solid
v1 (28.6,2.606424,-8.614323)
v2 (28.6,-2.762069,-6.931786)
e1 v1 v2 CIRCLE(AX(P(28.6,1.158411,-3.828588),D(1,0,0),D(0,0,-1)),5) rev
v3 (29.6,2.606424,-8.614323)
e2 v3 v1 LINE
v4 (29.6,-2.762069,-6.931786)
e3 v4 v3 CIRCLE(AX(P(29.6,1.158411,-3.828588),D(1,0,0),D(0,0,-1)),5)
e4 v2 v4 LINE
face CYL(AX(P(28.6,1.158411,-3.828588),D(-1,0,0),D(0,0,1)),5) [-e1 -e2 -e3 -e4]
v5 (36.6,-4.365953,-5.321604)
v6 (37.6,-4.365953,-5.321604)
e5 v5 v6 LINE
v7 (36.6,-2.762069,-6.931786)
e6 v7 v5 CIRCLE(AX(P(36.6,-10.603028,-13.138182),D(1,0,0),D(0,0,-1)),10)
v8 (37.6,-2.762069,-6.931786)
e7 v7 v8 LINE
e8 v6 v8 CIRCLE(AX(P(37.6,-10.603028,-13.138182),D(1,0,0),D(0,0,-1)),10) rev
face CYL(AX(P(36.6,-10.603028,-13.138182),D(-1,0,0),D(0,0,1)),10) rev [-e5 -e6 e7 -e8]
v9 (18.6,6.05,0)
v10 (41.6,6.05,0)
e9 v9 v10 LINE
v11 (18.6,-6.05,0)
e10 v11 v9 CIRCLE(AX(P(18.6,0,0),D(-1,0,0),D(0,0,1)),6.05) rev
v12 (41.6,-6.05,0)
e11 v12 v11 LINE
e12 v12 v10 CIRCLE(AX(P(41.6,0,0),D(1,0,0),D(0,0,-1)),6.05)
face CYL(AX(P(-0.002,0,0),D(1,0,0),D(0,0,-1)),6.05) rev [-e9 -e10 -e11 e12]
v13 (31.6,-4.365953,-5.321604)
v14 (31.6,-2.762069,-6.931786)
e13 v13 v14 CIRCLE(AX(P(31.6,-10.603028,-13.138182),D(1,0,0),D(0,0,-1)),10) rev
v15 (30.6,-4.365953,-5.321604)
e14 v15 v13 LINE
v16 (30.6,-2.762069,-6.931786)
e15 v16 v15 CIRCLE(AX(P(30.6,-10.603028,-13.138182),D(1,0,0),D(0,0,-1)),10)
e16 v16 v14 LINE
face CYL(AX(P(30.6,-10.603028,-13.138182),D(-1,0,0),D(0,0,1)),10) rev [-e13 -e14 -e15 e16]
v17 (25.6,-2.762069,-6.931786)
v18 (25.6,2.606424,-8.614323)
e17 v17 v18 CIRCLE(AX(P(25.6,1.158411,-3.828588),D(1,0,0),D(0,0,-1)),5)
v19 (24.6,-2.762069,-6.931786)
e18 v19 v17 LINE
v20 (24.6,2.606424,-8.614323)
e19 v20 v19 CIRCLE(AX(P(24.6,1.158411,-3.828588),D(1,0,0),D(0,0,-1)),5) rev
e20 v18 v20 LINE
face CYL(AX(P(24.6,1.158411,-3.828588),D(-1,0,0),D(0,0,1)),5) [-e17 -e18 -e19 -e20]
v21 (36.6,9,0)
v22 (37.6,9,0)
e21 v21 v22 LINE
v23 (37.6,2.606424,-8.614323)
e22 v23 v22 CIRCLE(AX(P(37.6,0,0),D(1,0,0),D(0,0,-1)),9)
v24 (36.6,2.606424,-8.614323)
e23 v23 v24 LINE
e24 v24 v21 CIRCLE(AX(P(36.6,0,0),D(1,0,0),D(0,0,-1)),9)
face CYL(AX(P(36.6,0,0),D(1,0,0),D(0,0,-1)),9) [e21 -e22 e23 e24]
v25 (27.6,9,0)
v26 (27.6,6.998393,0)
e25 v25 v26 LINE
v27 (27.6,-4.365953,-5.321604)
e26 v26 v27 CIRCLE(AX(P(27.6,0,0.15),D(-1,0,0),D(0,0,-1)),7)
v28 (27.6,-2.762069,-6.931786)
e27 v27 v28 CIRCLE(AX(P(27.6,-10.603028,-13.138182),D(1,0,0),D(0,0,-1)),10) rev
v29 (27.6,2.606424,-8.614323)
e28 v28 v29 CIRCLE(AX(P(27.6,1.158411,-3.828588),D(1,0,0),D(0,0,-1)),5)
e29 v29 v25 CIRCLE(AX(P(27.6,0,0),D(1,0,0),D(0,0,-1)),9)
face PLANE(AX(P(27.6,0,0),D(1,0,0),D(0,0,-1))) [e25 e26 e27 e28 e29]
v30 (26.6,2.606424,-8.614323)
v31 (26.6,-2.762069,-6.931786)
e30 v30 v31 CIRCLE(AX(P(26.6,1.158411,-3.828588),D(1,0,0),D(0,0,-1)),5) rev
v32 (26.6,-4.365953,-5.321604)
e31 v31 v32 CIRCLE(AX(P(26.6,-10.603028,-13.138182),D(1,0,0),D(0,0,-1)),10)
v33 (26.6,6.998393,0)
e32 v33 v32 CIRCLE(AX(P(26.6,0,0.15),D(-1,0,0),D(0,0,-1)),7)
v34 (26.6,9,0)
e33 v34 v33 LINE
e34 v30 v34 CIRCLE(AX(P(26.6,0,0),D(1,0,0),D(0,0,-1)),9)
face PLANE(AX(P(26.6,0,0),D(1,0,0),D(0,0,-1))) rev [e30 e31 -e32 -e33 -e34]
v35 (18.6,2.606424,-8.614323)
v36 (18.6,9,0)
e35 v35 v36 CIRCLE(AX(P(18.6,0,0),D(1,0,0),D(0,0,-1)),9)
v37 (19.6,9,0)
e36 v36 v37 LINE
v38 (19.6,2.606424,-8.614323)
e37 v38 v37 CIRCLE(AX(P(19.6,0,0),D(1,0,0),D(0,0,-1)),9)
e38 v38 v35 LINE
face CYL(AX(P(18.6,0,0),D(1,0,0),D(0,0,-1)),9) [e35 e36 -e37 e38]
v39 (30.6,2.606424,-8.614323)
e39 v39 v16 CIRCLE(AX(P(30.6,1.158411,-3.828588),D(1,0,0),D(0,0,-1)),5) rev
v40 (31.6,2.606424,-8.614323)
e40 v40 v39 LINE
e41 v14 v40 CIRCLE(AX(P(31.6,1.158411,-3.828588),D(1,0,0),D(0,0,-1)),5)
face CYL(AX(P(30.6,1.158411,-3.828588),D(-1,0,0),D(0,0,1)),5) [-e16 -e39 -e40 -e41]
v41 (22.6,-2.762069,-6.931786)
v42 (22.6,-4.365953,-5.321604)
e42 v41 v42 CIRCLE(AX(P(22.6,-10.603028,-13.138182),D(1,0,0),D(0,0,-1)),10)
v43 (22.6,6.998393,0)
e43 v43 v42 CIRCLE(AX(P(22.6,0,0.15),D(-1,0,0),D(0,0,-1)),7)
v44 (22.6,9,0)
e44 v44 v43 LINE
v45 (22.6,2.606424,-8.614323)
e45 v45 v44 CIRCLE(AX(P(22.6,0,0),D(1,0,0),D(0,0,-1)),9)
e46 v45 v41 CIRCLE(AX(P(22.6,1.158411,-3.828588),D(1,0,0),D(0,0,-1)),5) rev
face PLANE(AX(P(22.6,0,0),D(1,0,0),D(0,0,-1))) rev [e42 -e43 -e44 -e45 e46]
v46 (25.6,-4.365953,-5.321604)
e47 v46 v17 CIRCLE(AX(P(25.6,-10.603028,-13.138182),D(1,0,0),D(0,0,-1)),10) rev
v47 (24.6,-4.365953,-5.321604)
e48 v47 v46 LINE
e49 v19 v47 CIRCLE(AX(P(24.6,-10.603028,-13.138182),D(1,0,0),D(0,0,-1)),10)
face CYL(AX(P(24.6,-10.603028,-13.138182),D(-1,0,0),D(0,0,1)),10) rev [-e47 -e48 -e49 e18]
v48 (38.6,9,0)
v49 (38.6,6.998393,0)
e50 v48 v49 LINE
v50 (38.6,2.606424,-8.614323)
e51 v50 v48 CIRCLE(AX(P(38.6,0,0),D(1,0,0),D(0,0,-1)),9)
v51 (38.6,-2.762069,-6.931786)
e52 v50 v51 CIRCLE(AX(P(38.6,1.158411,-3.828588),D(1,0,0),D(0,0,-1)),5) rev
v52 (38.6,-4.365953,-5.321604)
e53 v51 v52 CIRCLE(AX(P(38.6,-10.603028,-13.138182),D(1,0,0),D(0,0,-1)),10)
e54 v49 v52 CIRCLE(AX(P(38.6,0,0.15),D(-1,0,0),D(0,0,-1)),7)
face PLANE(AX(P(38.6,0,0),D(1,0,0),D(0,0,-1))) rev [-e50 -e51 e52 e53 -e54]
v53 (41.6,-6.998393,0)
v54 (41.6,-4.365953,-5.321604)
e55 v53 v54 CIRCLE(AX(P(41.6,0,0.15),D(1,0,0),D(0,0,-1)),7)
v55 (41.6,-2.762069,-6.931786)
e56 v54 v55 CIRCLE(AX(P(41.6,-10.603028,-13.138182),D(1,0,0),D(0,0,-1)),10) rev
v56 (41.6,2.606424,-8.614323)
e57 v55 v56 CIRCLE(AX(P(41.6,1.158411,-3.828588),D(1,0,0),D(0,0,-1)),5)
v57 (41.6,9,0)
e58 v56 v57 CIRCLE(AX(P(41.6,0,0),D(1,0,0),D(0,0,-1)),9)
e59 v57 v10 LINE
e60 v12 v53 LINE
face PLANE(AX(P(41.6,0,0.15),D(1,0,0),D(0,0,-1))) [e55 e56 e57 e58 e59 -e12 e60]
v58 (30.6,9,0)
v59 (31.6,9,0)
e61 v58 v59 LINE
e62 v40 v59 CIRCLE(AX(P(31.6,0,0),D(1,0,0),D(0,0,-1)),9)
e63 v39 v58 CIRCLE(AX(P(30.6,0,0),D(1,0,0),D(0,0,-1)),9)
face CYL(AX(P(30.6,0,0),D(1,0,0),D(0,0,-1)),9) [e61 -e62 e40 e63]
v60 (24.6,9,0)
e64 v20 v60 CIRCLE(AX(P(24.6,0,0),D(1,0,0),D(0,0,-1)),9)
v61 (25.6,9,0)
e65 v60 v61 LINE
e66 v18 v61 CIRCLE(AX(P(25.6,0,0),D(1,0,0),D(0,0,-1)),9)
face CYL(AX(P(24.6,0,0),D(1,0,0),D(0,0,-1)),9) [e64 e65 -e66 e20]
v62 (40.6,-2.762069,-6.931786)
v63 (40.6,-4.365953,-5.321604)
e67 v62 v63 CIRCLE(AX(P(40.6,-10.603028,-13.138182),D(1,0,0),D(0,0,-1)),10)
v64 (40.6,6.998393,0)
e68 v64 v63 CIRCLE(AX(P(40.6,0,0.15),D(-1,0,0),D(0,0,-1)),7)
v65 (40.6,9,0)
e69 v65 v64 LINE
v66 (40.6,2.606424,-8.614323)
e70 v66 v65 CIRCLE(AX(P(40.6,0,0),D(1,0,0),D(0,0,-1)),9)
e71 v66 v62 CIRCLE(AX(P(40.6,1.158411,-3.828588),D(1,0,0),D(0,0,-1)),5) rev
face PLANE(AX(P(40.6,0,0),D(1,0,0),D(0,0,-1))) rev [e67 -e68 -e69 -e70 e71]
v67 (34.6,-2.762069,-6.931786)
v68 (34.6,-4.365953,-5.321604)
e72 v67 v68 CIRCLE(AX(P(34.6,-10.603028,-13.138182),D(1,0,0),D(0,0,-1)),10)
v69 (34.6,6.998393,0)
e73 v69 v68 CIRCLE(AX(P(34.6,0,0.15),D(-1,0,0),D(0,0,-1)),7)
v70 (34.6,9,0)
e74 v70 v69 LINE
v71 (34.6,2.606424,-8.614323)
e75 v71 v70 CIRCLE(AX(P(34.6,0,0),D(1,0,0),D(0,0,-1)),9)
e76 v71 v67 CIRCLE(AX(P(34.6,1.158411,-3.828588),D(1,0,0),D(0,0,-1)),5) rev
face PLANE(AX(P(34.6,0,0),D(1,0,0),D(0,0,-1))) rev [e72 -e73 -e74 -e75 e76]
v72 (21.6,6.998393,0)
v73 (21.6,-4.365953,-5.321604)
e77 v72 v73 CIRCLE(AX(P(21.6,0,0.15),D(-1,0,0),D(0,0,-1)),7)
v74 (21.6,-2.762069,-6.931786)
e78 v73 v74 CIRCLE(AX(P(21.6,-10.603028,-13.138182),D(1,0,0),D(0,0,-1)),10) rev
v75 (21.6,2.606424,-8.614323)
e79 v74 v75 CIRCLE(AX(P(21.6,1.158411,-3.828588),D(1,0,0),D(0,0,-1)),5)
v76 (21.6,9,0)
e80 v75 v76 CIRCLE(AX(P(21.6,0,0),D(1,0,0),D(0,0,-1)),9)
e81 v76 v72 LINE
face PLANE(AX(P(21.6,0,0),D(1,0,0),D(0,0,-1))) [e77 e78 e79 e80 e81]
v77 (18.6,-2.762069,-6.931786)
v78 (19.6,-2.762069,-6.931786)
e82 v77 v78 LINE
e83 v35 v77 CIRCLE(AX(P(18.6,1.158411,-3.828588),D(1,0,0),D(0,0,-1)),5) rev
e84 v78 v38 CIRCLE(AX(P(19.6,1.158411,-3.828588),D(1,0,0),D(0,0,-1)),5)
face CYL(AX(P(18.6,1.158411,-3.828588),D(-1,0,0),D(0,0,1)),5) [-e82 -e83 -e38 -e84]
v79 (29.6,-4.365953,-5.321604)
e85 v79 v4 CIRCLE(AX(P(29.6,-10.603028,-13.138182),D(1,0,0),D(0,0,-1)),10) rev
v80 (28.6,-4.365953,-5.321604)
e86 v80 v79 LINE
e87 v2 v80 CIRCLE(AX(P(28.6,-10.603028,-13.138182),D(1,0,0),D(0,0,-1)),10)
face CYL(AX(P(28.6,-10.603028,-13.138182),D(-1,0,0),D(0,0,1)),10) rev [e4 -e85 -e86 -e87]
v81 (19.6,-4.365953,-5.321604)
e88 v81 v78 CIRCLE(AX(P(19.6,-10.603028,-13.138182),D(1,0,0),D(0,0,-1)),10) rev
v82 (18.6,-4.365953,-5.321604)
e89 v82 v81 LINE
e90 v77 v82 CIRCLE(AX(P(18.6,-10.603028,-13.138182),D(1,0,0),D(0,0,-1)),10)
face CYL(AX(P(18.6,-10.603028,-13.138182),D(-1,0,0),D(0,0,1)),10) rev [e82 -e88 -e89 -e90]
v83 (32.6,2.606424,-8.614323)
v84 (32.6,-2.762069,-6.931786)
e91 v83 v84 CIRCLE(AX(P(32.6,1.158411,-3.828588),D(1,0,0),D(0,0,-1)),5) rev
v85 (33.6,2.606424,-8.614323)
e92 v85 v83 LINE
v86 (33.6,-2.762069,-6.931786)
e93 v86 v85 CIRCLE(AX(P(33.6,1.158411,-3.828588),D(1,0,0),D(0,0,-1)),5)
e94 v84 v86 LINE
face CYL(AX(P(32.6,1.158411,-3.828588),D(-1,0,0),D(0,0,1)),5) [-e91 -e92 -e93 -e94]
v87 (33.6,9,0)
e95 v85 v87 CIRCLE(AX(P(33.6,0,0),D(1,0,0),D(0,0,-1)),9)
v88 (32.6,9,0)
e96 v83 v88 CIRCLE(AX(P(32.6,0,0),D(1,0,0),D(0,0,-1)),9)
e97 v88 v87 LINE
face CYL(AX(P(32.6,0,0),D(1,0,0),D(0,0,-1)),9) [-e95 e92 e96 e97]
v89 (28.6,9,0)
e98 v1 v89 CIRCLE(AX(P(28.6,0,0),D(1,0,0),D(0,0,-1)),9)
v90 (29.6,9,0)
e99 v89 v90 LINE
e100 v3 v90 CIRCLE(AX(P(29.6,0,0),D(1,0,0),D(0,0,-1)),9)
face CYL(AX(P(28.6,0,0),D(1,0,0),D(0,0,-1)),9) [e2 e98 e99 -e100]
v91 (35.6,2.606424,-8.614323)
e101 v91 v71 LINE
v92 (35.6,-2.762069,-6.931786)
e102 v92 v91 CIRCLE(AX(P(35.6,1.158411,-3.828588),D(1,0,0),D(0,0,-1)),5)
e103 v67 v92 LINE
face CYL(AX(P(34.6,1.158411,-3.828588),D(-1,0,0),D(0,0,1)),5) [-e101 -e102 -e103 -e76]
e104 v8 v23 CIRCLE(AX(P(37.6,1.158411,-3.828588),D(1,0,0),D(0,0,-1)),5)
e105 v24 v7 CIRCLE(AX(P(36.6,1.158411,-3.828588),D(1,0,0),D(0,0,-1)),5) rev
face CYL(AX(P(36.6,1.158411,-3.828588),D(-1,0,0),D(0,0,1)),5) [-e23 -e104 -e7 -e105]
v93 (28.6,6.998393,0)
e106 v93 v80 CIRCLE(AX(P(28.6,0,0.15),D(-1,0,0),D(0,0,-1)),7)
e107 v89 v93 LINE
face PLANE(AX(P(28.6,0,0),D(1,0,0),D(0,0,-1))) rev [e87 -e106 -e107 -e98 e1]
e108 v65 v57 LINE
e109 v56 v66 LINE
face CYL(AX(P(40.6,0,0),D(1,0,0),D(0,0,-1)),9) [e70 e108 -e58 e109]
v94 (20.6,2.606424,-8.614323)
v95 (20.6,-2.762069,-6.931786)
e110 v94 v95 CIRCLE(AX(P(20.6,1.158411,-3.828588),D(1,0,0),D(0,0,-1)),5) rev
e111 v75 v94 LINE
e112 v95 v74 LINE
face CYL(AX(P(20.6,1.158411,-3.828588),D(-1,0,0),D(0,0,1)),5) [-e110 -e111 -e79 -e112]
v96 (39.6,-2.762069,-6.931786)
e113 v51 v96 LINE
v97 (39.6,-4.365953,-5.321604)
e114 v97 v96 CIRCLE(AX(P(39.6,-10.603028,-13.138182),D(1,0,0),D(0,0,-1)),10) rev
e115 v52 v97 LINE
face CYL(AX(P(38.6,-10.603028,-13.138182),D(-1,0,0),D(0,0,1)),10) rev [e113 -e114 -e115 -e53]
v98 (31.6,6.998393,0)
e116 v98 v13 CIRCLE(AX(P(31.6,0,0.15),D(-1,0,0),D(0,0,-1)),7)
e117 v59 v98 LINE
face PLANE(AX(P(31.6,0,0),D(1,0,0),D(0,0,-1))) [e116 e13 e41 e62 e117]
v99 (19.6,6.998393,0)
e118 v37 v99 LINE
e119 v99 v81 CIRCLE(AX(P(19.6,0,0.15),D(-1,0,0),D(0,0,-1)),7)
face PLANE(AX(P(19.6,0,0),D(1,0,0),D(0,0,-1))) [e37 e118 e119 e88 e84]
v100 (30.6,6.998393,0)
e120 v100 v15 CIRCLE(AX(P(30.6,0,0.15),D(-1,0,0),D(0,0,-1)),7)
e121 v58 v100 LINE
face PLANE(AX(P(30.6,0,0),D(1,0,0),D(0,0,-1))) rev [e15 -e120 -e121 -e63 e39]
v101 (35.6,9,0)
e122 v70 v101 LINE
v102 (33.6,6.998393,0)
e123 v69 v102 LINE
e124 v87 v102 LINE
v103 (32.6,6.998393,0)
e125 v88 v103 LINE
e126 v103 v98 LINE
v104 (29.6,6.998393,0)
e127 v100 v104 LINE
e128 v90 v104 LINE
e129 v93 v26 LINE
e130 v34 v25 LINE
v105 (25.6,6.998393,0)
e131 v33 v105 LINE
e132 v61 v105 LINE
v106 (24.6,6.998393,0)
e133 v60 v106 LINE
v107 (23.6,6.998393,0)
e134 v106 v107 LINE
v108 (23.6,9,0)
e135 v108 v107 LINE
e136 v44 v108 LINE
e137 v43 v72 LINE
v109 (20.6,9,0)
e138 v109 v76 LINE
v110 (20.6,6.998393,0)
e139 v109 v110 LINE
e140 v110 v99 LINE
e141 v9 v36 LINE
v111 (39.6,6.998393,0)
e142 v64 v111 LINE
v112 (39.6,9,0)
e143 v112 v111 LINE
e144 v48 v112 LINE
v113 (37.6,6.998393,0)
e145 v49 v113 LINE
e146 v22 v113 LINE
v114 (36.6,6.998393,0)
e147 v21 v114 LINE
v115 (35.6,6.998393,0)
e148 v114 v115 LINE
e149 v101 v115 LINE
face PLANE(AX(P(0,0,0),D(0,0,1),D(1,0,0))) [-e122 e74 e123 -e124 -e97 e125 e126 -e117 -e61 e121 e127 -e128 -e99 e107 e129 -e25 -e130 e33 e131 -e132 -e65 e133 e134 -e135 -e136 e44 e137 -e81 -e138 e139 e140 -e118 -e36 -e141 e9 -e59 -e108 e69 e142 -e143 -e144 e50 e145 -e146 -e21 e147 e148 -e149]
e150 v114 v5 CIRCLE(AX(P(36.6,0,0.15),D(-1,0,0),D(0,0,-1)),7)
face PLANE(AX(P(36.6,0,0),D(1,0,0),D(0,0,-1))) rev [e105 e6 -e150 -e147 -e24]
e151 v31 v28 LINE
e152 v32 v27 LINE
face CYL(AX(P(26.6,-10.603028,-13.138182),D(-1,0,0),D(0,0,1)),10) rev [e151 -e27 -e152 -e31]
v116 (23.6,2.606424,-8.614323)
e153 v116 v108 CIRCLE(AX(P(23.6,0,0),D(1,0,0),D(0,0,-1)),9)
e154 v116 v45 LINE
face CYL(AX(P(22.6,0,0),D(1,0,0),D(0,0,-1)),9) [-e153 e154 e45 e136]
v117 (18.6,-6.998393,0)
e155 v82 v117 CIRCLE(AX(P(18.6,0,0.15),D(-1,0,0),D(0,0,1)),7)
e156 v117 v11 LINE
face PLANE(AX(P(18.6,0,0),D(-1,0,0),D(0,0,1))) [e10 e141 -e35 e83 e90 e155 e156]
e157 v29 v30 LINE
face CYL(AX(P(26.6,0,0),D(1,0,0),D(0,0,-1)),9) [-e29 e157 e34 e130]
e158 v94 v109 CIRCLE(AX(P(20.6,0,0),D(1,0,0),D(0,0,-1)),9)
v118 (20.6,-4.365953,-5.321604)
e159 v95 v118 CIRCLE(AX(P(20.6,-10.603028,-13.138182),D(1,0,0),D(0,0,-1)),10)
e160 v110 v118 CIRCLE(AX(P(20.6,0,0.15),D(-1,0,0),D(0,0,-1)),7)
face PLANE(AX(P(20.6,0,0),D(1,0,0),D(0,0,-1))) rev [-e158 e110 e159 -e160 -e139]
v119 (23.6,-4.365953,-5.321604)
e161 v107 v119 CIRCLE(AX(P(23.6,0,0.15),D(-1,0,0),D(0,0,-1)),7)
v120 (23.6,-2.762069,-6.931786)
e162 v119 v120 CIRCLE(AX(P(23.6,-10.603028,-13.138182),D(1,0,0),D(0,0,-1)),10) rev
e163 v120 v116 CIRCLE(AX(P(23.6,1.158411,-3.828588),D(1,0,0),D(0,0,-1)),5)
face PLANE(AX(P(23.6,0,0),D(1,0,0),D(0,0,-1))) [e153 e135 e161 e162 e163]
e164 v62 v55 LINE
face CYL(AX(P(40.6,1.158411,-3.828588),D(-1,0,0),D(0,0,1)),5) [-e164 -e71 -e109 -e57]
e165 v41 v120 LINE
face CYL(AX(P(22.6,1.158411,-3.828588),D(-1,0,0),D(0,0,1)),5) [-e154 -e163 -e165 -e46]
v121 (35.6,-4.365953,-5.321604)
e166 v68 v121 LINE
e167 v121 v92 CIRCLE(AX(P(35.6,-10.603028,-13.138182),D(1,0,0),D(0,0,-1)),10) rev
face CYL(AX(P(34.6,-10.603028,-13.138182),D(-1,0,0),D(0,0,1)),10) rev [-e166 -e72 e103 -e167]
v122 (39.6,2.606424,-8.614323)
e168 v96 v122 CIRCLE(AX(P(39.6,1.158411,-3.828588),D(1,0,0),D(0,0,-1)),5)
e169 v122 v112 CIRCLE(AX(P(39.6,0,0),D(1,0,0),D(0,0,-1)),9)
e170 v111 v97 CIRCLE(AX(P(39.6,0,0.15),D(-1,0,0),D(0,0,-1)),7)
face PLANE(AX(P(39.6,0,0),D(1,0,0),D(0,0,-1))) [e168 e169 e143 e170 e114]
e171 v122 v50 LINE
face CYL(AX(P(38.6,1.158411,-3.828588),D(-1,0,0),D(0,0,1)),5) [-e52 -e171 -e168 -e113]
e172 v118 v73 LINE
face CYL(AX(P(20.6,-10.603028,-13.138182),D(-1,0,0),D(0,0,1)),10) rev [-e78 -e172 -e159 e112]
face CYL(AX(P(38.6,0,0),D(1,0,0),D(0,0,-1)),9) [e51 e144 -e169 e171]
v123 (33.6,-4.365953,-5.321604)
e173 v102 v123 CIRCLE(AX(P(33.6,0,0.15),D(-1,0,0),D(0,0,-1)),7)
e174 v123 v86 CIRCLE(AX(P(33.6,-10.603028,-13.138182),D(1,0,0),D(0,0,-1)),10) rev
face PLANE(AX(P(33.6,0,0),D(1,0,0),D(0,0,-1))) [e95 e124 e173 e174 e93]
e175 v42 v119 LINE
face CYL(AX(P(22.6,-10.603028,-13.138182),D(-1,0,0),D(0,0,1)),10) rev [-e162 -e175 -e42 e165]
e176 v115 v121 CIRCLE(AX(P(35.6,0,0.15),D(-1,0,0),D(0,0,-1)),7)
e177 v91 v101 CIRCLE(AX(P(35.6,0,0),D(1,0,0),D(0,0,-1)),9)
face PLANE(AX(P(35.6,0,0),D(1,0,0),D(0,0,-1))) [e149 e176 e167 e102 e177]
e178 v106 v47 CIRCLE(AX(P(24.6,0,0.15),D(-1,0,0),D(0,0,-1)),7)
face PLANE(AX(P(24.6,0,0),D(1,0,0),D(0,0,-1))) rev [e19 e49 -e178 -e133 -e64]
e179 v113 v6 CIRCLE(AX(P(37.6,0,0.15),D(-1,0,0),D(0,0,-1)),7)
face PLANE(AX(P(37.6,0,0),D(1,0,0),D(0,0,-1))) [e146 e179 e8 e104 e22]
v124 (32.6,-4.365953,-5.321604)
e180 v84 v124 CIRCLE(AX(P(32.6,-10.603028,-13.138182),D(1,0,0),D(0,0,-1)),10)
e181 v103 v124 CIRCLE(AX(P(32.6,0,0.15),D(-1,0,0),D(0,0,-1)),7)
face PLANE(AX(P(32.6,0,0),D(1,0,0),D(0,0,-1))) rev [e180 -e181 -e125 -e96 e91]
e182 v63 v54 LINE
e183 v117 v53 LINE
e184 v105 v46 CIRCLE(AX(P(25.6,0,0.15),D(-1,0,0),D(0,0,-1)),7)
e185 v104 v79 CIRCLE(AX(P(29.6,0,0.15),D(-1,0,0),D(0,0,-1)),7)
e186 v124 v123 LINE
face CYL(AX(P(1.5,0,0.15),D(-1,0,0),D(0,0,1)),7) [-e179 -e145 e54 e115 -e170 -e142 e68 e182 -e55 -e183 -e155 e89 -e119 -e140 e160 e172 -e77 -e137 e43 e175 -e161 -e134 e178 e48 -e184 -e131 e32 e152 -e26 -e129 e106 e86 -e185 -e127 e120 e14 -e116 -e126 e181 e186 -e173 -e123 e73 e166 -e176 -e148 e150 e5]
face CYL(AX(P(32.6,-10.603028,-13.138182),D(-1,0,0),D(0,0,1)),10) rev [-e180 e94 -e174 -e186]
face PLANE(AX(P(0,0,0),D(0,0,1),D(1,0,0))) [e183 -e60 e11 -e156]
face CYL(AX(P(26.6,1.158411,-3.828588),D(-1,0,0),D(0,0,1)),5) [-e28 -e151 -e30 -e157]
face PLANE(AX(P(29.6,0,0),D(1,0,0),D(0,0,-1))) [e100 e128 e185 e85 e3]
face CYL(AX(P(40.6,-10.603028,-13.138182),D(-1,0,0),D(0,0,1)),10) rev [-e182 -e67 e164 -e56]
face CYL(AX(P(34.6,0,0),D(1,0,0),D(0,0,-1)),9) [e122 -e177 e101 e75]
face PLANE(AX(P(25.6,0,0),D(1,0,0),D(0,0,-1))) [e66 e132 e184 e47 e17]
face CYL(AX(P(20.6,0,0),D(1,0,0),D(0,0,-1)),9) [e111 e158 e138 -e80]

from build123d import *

# Parameters (mm, degrees)
SKETCH1_R           = 7
SKETCH1_R_2         = 0.8
SKETCH1_R_3         = 4
BOSS_EXTRUDE1_DEPTH = 1.5
SKETCH2_R           = 7
SKETCH2_R_2         = 6.4
BOSS_EXTRUDE2_DEPTH = 40.1
BOSS_EXTRUDE5_REACH = 44.786
SKETCH12_R          = 6.4
SKETCH12_R_2        = 6.05
BOSS_EXTRUDE7_START = -1
BOSS_EXTRUDE7_DEPTH = 1
FILLET2_R           = 10
FILLET3_R           = 5
LPATTERN1_START     = 18.6
LPATTERN1_DEPTH     = 1
LPATTERN1_START_2   = 20.6
LPATTERN1_2_DEPTH   = 1
LPATTERN1_START_3   = 22.6
LPATTERN1_3_DEPTH   = 1
LPATTERN1_START_4   = 24.6
LPATTERN1_4_DEPTH   = 1
LPATTERN1_START_5   = 26.6
LPATTERN1_5_DEPTH   = 1
LPATTERN1_START_6   = 28.6
LPATTERN1_6_DEPTH   = 1
LPATTERN1_START_7   = 30.6
LPATTERN1_7_DEPTH   = 1
LPATTERN1_START_8   = 32.6
LPATTERN1_8_DEPTH   = 1
LPATTERN1_START_9   = 34.6
LPATTERN1_9_DEPTH   = 1
LPATTERN1_START_10  = 36.6
LPATTERN1_10_DEPTH  = 1
LPATTERN1_START_11  = 38.6
LPATTERN1_11_DEPTH  = 1
SKETCH15_W          = 17.693531028
SKETCH15_H          = 16
SKETCH16_W          = 23
SKETCH16_H          = 16


with BuildPart() as part:
    # Sketch1 → Boss-Extrude1 (new body)
    with BuildSketch(Plane(origin=(0, 0, 0), x_dir=(0, 0, -1), z_dir=(1, 0, 0))):
        with Locations((-0.15, 0)):
            Circle(SKETCH1_R)
        with Locations((0, 5)):
            Circle(SKETCH1_R_2, mode=Mode.SUBTRACT)
        with Locations((-4.330127019, -2.5)):
            Circle(SKETCH1_R_2, mode=Mode.SUBTRACT)
        with Locations((4.330127019, -2.5)):
            Circle(SKETCH1_R_2, mode=Mode.SUBTRACT)
        Circle(SKETCH1_R_3, mode=Mode.SUBTRACT)
    extrude(amount=BOSS_EXTRUDE1_DEPTH)

    # Sketch2 → Boss-Extrude2 (add)
    with BuildSketch(Plane(origin=(1.5, 0, 0), x_dir=(0, 0, -1), z_dir=(1, 0, 0))):
        with Locations((-0.15, 0)):
            Circle(SKETCH2_R)
        with Locations((-0.15, 0)):
            Circle(SKETCH2_R_2, mode=Mode.SUBTRACT)
    extrude(amount=BOSS_EXTRUDE2_DEPTH)

    # Sketch12 → Boss-Extrude5 (add, up to next)
    with BuildSketch(Plane(origin=(41.6, 0, 0), x_dir=(0, 0, -1), z_dir=(1, 0, 0)), mode=Mode.PRIVATE) as boss_extrude5_sk1:
        with Locations((-0.15, 0)):
            Circle(SKETCH12_R)
        Circle(SKETCH12_R_2, mode=Mode.SUBTRACT)
    boss_extrude5_tool1 = extrude(boss_extrude5_sk1.sketch, amount=-BOSS_EXTRUDE5_REACH, mode=Mode.PRIVATE) - part.part
    add(boss_extrude5_tool1.solids().sort_by_distance((41.6, 0, 6.368981))[0])

    # Sketch14 → Boss-Extrude7 (add)
    with BuildSketch(Plane(origin=(41.6, 0, 0), x_dir=(0, 0, -1), z_dir=(1, 0, 0)).offset(BOSS_EXTRUDE7_START)):
        with BuildLine():
            Line((-7.039083492, -1.241180339), (-8.863269777, -1.562833599))
            ThreePointArc((-8.863269777, -1.562833599), (0, 9), (8.863269777, -1.562833599))
            Line((8.863269777, -1.562833599), (6.748129599, -1.189877318))
            ThreePointArc((6.748129599, -1.189877318), (-0.176047227, 6.999951539), (-7.039083492, -1.241180339))
        make_face()
    extrude(amount=BOSS_EXTRUDE7_DEPTH)

    # Fillet2
    # the kernel refuses this fillet: 10 mm, written as the material it adds along each edge
    with BuildSketch(Plane(origin=(40.6, -1.189877318, -6.748129599), x_dir=(0, -0.9122124275498226, 0.40971756982543417), z_dir=(1, 0, 0))) as fillet2_piece_1:
        with BuildLine():
            CenterArc((5.968676638, 9.685818843), FILLET2_R, 229.495547536, 26.104158306)
            Line((-0.526394739, 2.082263897), (-0.656296166, 1.930192799))
            ThreePointArc((-0.656296166, 1.930192799), (-0.457097485, 0.992114146), (-0.193900116, -0.049017803))
            Line((-0.193900116, -0.049017803), (0.049738972, -0.193716377))
            ThreePointArc((0.049738972, -0.193716377), (1.740864019, 0.01992681), (3.431989067, -0.193716377))
            Line((3.431989067, -0.193716377), (3.481728039, 0))
        make_face()
    extrude(amount=1)
    with BuildSketch(Plane(origin=(40.6, -1.241180339, 7.039083492), x_dir=(0, -0.9145376119425217, -0.4045008731047063), z_dir=(1, 0, 0))) as fillet2_piece_2:
        with BuildLine():
            CenterArc((5.662402917, -9.717692138), FILLET2_R, 103.646653122, 23.987142505)
            Line((-0.443720941, -1.798395993), (-0.565843418, -1.64001007))
            ThreePointArc((-0.565843418, -1.64001007), (-0.416037384, -0.851288435), (-0.194176914, 0.047909561))
            Line((-0.194176914, 0.047909561), (0.047186691, 0.194353843))
            ThreePointArc((0.047186691, 0.194353843), (1.651534184, 0.002384497), (3.255881677, 0.194353843))
            Line((3.255881677, 0.194353843), (3.303068368, 0))
        make_face()
    extrude(amount=1)

    # Fillet3
    fillet3_edges = [part.edges().sort_by_distance(p)[0] for p in [
        (41.1, -1.562833599, 8.863269777),
        (41.1, -1.562833599, -8.863269777),
    ]]
    fillet(fillet3_edges, radius=FILLET3_R)

    # LPattern1: read off the stored shape, not the designer's step
    # LPattern1 outline → LPattern1 (add)
    with BuildSketch(Plane.YZ.offset(LPATTERN1_START)):
        with BuildLine():
            ThreePointArc((-2.762069023, -6.931785952), (-0.336916962, -8.599750686), (2.606424088, -8.614322578))
            ThreePointArc((2.606424088, -8.614322578), (8.998759062, 0.149450112), (2.31893468, 8.696122236))
            ThreePointArc((2.31893468, 8.696122236), (-0.448823677, 8.641049813), (-2.763066821, 7.121905987))
            ThreePointArc((-2.763066821, 7.121905987), (-3.475808056, 6.373673153), (-4.261960597, 5.702989453))
            ThreePointArc((-4.261960597, 5.702989453), (6.999688602, 0.083973644), (-4.365952904, -5.321604449))
            ThreePointArc((-4.365952904, -5.321604449), (-3.518119256, -6.080982981), (-2.762069023, -6.931785952))
        make_face()
    extrude(amount=LPATTERN1_DEPTH)

    # LPattern1 2 outline → LPattern1 2 (add)
    with BuildSketch(Plane.YZ.offset(LPATTERN1_START_2)):
        with BuildLine():
            ThreePointArc((-2.762069023, -6.931785952), (-0.336916962, -8.599750686), (2.606424088, -8.614322578))
            ThreePointArc((2.606424088, -8.614322578), (8.998759062, 0.149450112), (2.31893468, 8.696122236))
            ThreePointArc((2.31893468, 8.696122236), (-0.448823677, 8.641049813), (-2.763066821, 7.121905987))
            ThreePointArc((-2.763066821, 7.121905987), (-3.475808056, 6.373673153), (-4.261960597, 5.702989453))
            ThreePointArc((-4.261960597, 5.702989453), (6.999688602, 0.083973644), (-4.365952904, -5.321604449))
            ThreePointArc((-4.365952904, -5.321604449), (-3.518119256, -6.080982981), (-2.762069023, -6.931785952))
        make_face()
    extrude(amount=LPATTERN1_2_DEPTH)

    # LPattern1 3 outline → LPattern1 3 (add)
    with BuildSketch(Plane.YZ.offset(LPATTERN1_START_3)):
        with BuildLine():
            ThreePointArc((-2.762069023, -6.931785952), (-0.336916962, -8.599750686), (2.606424088, -8.614322578))
            ThreePointArc((2.606424088, -8.614322578), (8.998759062, 0.149450112), (2.31893468, 8.696122236))
            ThreePointArc((2.31893468, 8.696122236), (-0.448823677, 8.641049813), (-2.763066821, 7.121905987))
            ThreePointArc((-2.763066821, 7.121905987), (-3.475808056, 6.373673153), (-4.261960597, 5.702989453))
            ThreePointArc((-4.261960597, 5.702989453), (6.999688602, 0.083973644), (-4.365952904, -5.321604449))
            ThreePointArc((-4.365952904, -5.321604449), (-3.518119256, -6.080982981), (-2.762069023, -6.931785952))
        make_face()
    extrude(amount=LPATTERN1_3_DEPTH)

    # LPattern1 4 outline → LPattern1 4 (add)
    with BuildSketch(Plane.YZ.offset(LPATTERN1_START_4)):
        with BuildLine():
            ThreePointArc((-2.762069023, -6.931785952), (-0.336916962, -8.599750686), (2.606424088, -8.614322578))
            ThreePointArc((2.606424088, -8.614322578), (8.998759062, 0.149450112), (2.31893468, 8.696122236))
            ThreePointArc((2.31893468, 8.696122236), (-0.448823677, 8.641049813), (-2.763066821, 7.121905987))
            ThreePointArc((-2.763066821, 7.121905987), (-3.475808056, 6.373673153), (-4.261960597, 5.702989453))
            ThreePointArc((-4.261960597, 5.702989453), (6.999688602, 0.083973644), (-4.365952904, -5.321604449))
            ThreePointArc((-4.365952904, -5.321604449), (-3.518119256, -6.080982981), (-2.762069023, -6.931785952))
        make_face()
    extrude(amount=LPATTERN1_4_DEPTH)

    # LPattern1 5 outline → LPattern1 5 (add)
    with BuildSketch(Plane.YZ.offset(LPATTERN1_START_5)):
        with BuildLine():
            ThreePointArc((-2.762069023, -6.931785952), (-0.336916962, -8.599750686), (2.606424088, -8.614322578))
            ThreePointArc((2.606424088, -8.614322578), (8.998759062, 0.149450112), (2.31893468, 8.696122236))
            ThreePointArc((2.31893468, 8.696122236), (-0.448823677, 8.641049813), (-2.763066821, 7.121905987))
            ThreePointArc((-2.763066821, 7.121905987), (-3.475808056, 6.373673153), (-4.261960597, 5.702989453))
            ThreePointArc((-4.261960597, 5.702989453), (6.999688602, 0.083973644), (-4.365952904, -5.321604449))
            ThreePointArc((-4.365952904, -5.321604449), (-3.518119256, -6.080982981), (-2.762069023, -6.931785952))
        make_face()
    extrude(amount=LPATTERN1_5_DEPTH)

    # LPattern1 6 outline → LPattern1 6 (add)
    with BuildSketch(Plane.YZ.offset(LPATTERN1_START_6)):
        with BuildLine():
            ThreePointArc((-2.762069023, -6.931785952), (-0.336916962, -8.599750686), (2.606424088, -8.614322578))
            ThreePointArc((2.606424088, -8.614322578), (8.998759062, 0.149450112), (2.31893468, 8.696122236))
            ThreePointArc((2.31893468, 8.696122236), (-0.448823677, 8.641049813), (-2.763066821, 7.121905987))
            ThreePointArc((-2.763066821, 7.121905987), (-3.475808056, 6.373673153), (-4.261960597, 5.702989453))
            ThreePointArc((-4.261960597, 5.702989453), (6.999688602, 0.083973644), (-4.365952904, -5.321604449))
            ThreePointArc((-4.365952904, -5.321604449), (-3.518119256, -6.080982981), (-2.762069023, -6.931785952))
        make_face()
    extrude(amount=LPATTERN1_6_DEPTH)

    # LPattern1 7 outline → LPattern1 7 (add)
    with BuildSketch(Plane.YZ.offset(LPATTERN1_START_7)):
        with BuildLine():
            ThreePointArc((-2.762069023, -6.931785952), (-0.336916962, -8.599750686), (2.606424088, -8.614322578))
            ThreePointArc((2.606424088, -8.614322578), (8.998759062, 0.149450112), (2.31893468, 8.696122236))
            ThreePointArc((2.31893468, 8.696122236), (-0.448823677, 8.641049813), (-2.763066821, 7.121905987))
            ThreePointArc((-2.763066821, 7.121905987), (-3.475808056, 6.373673153), (-4.261960597, 5.702989453))
            ThreePointArc((-4.261960597, 5.702989453), (6.999688602, 0.083973644), (-4.365952904, -5.321604449))
            ThreePointArc((-4.365952904, -5.321604449), (-3.518119256, -6.080982981), (-2.762069023, -6.931785952))
        make_face()
    extrude(amount=LPATTERN1_7_DEPTH)

    # LPattern1 8 outline → LPattern1 8 (add)
    with BuildSketch(Plane.YZ.offset(LPATTERN1_START_8)):
        with BuildLine():
            ThreePointArc((-2.762069023, -6.931785952), (-0.336916962, -8.599750686), (2.606424088, -8.614322578))
            ThreePointArc((2.606424088, -8.614322578), (8.998759062, 0.149450112), (2.31893468, 8.696122236))
            ThreePointArc((2.31893468, 8.696122236), (-0.448823677, 8.641049813), (-2.763066821, 7.121905987))
            ThreePointArc((-2.763066821, 7.121905987), (-3.475808056, 6.373673153), (-4.261960597, 5.702989453))
            ThreePointArc((-4.261960597, 5.702989453), (6.999688602, 0.083973644), (-4.365952904, -5.321604449))
            ThreePointArc((-4.365952904, -5.321604449), (-3.518119256, -6.080982981), (-2.762069023, -6.931785952))
        make_face()
    extrude(amount=LPATTERN1_8_DEPTH)

    # LPattern1 9 outline → LPattern1 9 (add)
    with BuildSketch(Plane.YZ.offset(LPATTERN1_START_9)):
        with BuildLine():
            ThreePointArc((-2.762069023, -6.931785952), (-0.336916962, -8.599750686), (2.606424088, -8.614322578))
            ThreePointArc((2.606424088, -8.614322578), (8.998759062, 0.149450112), (2.31893468, 8.696122236))
            ThreePointArc((2.31893468, 8.696122236), (-0.448823677, 8.641049813), (-2.763066821, 7.121905987))
            ThreePointArc((-2.763066821, 7.121905987), (-3.475808056, 6.373673153), (-4.261960597, 5.702989453))
            ThreePointArc((-4.261960597, 5.702989453), (6.999688602, 0.083973644), (-4.365952904, -5.321604449))
            ThreePointArc((-4.365952904, -5.321604449), (-3.518119256, -6.080982981), (-2.762069023, -6.931785952))
        make_face()
    extrude(amount=LPATTERN1_9_DEPTH)

    # LPattern1 10 outline → LPattern1 10 (add)
    with BuildSketch(Plane.YZ.offset(LPATTERN1_START_10)):
        with BuildLine():
            ThreePointArc((-2.762069023, -6.931785952), (-0.336916962, -8.599750686), (2.606424088, -8.614322578))
            ThreePointArc((2.606424088, -8.614322578), (8.998759062, 0.149450112), (2.31893468, 8.696122236))
            ThreePointArc((2.31893468, 8.696122236), (-0.448823677, 8.641049813), (-2.763066821, 7.121905987))
            ThreePointArc((-2.763066821, 7.121905987), (-3.475808056, 6.373673153), (-4.261960597, 5.702989453))
            ThreePointArc((-4.261960597, 5.702989453), (6.999688602, 0.083973644), (-4.365952904, -5.321604449))
            ThreePointArc((-4.365952904, -5.321604449), (-3.518119256, -6.080982981), (-2.762069023, -6.931785952))
        make_face()
    extrude(amount=LPATTERN1_10_DEPTH)

    # LPattern1 11 outline → LPattern1 11 (add)
    with BuildSketch(Plane.YZ.offset(LPATTERN1_START_11)):
        with BuildLine():
            ThreePointArc((-2.762069023, -6.931785952), (-0.336916962, -8.599750686), (2.606424088, -8.614322578))
            ThreePointArc((2.606424088, -8.614322578), (8.998759062, 0.149450112), (2.31893468, 8.696122236))
            ThreePointArc((2.31893468, 8.696122236), (-0.448823677, 8.641049813), (-2.763066821, 7.121905987))
            ThreePointArc((-2.763066821, 7.121905987), (-3.475808056, 6.373673153), (-4.261960597, 5.702989453))
            ThreePointArc((-4.261960597, 5.702989453), (6.999688602, 0.083973644), (-4.365952904, -5.321604449))
            ThreePointArc((-4.365952904, -5.321604449), (-3.518119256, -6.080982981), (-2.762069023, -6.931785952))
        make_face()
    extrude(amount=LPATTERN1_11_DEPTH)


with BuildPart() as body_2:
    # Split2: the piece behind the surface
    add(part.part)
    # Sketch15 → Surface-Plane1: a flat surface bounded by the sketch
    with BuildSketch(Plane.ZY.offset(-18.6), mode=Mode.PRIVATE) as surface_plane1_1_region:
        with Locations((0.018177702, 1)):
            Rectangle(SKETCH15_W, SKETCH15_H)
    surface_plane1_1 = surface_plane1_1_region.sketch.faces()[0]
    split(bisect_by=surface_plane1_1, keep=Keep.BOTTOM)


with BuildPart() as part_1:
    add(part.part)

    # Split2: split by a surface, the side it looks to stays
    # Sketch15 → Surface-Plane1: a flat surface bounded by the sketch
    with BuildSketch(Plane.ZY.offset(-18.6), mode=Mode.PRIVATE) as surface_plane1_2_region:
        with Locations((0.018177702, 1)):
            Rectangle(SKETCH15_W, SKETCH15_H)
    surface_plane1_2 = surface_plane1_2_region.sketch.faces()[0]
    split(bisect_by=surface_plane1_2, keep=Keep.TOP)


with BuildPart() as body_2_2:
    # Split3: the piece behind the surface
    add(body_2.part)
    # Sketch16 → Surface-Plane2: a flat surface bounded by the sketch
    with BuildSketch(Plane.XY, mode=Mode.PRIVATE) as surface_plane2_3_region:
        with Locations((30.1, 1)):
            Rectangle(SKETCH16_W, SKETCH16_H)
    surface_plane2_3 = surface_plane2_3_region.sketch.faces()[0]
    split(bisect_by=surface_plane2_3, keep=Keep.BOTTOM)


with BuildPart() as body_2_1:
    add(body_2.part)

    # Split3: split by a surface, the side it looks to stays
    # Sketch16 → Surface-Plane2: a flat surface bounded by the sketch
    with BuildSketch(Plane.XY, mode=Mode.PRIVATE) as surface_plane2_4_region:
        with Locations((30.1, 1)):
            Rectangle(SKETCH16_W, SKETCH16_H)
    surface_plane2_4 = surface_plane2_4_region.sketch.faces()[0]
    split(bisect_by=surface_plane2_4, keep=Keep.TOP)


solid = body_2_2.part
